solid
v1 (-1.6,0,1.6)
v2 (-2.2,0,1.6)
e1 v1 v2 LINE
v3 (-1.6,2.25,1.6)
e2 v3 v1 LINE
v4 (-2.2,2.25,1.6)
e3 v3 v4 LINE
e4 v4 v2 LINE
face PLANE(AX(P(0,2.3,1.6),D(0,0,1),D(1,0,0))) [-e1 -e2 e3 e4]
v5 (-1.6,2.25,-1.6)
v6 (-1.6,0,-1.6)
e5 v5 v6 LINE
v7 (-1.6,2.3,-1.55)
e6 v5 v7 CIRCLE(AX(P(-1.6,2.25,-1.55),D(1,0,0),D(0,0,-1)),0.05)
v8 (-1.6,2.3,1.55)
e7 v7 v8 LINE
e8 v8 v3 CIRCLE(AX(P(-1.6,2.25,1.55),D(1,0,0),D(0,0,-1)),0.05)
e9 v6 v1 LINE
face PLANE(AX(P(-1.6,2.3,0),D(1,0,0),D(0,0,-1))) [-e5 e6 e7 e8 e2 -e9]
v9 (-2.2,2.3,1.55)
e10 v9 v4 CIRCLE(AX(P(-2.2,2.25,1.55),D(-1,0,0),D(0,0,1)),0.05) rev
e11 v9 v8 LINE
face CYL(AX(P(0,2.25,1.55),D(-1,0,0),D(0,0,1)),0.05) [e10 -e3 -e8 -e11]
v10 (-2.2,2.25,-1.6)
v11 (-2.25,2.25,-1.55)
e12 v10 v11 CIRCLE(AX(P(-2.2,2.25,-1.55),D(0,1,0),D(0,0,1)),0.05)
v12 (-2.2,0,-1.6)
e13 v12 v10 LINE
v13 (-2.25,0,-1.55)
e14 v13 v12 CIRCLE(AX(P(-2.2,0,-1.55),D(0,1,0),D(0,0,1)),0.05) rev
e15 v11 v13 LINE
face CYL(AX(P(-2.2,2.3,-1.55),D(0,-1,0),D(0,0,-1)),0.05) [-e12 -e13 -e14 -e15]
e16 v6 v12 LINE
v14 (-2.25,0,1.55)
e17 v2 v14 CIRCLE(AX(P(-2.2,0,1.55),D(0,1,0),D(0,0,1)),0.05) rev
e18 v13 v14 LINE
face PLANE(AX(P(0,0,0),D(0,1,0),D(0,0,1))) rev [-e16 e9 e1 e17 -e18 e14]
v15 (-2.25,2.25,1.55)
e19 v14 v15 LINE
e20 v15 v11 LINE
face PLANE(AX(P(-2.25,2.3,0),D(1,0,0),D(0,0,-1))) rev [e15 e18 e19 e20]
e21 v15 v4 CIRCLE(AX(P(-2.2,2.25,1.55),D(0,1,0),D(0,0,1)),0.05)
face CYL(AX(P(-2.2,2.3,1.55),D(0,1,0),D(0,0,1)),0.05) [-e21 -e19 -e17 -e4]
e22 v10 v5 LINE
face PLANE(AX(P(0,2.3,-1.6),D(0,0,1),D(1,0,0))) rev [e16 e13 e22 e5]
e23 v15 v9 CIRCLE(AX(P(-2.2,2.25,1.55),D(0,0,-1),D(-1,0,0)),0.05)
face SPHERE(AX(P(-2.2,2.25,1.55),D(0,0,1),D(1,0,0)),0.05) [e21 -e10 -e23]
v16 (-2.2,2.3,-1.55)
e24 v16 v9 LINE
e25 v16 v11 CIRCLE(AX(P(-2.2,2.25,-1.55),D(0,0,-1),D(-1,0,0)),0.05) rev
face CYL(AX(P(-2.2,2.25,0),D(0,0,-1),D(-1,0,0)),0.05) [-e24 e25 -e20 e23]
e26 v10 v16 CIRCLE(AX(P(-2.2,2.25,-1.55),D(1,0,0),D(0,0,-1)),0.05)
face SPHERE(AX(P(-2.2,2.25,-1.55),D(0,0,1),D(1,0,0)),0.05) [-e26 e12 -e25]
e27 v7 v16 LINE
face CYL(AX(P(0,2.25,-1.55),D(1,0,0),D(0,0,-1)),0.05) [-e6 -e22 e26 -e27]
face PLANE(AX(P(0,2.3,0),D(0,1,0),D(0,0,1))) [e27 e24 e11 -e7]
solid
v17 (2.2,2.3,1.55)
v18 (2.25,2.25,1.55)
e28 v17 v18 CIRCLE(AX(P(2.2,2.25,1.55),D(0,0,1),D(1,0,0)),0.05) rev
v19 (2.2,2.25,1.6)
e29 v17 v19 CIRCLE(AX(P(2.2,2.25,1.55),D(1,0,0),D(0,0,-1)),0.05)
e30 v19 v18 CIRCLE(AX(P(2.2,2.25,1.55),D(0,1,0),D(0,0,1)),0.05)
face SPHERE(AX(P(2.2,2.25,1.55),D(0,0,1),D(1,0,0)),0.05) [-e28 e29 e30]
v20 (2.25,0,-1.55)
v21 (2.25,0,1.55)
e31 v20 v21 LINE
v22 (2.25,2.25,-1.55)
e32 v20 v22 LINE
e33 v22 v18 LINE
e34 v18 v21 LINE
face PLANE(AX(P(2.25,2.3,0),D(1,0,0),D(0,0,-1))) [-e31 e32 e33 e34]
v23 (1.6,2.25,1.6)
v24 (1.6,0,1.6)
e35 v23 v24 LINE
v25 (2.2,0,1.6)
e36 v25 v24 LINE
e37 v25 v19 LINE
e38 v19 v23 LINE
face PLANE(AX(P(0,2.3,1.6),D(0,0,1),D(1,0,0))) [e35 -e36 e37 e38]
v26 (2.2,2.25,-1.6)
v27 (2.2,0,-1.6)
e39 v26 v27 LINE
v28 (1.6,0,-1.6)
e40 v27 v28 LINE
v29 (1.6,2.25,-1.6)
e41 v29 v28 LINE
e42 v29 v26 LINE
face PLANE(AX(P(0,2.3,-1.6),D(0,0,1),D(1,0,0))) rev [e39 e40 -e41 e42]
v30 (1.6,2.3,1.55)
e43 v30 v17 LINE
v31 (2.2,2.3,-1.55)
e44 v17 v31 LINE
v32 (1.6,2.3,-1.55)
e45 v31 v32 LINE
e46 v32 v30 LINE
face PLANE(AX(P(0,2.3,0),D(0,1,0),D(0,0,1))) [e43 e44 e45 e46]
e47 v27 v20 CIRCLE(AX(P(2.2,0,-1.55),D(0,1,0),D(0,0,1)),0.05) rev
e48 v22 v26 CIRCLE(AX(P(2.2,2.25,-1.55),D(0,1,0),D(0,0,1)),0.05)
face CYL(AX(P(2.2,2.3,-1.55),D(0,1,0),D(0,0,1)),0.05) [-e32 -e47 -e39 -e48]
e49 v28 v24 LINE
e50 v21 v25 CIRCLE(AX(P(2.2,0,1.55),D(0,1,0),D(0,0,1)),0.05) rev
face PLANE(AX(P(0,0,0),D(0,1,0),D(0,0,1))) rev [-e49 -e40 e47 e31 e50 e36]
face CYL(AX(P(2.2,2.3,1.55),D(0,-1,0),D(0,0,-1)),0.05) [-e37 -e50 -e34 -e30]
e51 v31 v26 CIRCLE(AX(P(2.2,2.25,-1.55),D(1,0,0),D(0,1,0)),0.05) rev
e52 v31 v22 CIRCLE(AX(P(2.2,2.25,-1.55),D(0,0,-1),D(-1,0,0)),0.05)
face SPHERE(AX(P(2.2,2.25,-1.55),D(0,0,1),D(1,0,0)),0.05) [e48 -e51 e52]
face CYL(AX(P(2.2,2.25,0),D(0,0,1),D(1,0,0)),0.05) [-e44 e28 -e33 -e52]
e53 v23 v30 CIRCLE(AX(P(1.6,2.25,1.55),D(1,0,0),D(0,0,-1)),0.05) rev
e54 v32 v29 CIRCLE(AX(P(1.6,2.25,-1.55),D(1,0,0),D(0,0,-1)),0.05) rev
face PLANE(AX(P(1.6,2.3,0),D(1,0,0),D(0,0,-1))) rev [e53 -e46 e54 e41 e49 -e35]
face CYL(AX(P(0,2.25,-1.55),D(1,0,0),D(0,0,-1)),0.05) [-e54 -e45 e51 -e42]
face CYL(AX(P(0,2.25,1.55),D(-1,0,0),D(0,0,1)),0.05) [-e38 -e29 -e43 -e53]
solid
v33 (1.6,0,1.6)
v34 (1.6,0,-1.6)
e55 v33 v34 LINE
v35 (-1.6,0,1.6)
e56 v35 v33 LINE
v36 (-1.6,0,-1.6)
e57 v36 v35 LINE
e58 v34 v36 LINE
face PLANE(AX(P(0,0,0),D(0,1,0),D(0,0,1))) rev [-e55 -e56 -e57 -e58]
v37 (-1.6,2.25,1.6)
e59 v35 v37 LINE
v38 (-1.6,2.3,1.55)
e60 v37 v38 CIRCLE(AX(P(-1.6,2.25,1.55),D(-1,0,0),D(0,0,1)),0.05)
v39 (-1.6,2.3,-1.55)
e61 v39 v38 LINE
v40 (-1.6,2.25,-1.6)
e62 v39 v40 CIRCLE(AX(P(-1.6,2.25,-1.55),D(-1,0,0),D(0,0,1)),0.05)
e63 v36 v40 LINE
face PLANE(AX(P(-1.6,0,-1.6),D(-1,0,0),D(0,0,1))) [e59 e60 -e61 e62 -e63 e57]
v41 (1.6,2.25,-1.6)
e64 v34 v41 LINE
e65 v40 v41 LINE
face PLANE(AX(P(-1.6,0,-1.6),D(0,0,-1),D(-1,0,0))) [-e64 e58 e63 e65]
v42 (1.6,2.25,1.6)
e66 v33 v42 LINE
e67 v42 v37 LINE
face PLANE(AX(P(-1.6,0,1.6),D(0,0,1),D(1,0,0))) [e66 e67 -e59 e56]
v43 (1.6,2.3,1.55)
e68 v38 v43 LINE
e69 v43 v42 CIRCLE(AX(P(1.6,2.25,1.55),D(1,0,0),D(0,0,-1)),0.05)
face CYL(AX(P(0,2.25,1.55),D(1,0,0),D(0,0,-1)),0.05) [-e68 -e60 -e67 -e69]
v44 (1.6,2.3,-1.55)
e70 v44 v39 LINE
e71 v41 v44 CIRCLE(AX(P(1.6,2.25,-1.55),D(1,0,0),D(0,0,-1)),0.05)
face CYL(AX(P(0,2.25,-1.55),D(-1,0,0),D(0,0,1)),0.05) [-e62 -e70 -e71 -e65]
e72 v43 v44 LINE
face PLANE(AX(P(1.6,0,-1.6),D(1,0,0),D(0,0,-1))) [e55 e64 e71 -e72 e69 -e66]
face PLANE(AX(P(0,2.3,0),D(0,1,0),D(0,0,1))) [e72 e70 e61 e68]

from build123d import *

# Parameters (mm, degrees)
CROQUIS1_W                = 0.65
CROQUIS1_H                = 3.2
SALIENTE_EXTRUIR1_DEPTH   = 2.3
SALIENTE_EXTRUIR1_2_DEPTH = 2.3
CROQUIS2_W                = 3.2
CROQUIS2_H                = 3.2
SALIENTE_EXTRUIR2_DEPTH   = 2.3
REDONDEO1_R               = 0.05
REDONDEO2_R               = 0.05
REDONDEO3_R               = 0.05
REDONDEO4_R               = 0.05


with BuildPart() as part:
    # Croquis1 → Saliente-Extruir1 (new body)
    with BuildSketch(Plane(origin=(0, 0, 0), x_dir=(1, 0, 0), z_dir=(0, 1, 0))):
        with Locations((-1.925, 0)):
            Rectangle(CROQUIS1_W, CROQUIS1_H)
    extrude(amount=SALIENTE_EXTRUIR1_DEPTH)

    # Redondeo1
    redondeo1_edges = [part.edges().sort_by_distance(p)[0] for p in [
        (-2.25, 2.3, 0),
        (-1.925, 2.3, 1.6),
        (-1.925, 2.3, -1.6),
    ]]
    fillet(redondeo1_edges, radius=REDONDEO1_R)

    # Redondeo4
    # the kernel refuses this fillet: 0.05 mm, written as the material it takes off along each edge
    with BuildSketch(Plane(origin=(-2.2, 2.25, 1.55), x_dir=(-1, 0, 0), z_dir=(0, 0, 1))) as redondeo4_piece_1_section:
        Polygon((0, 0), (REDONDEO4_R, 0), (REDONDEO4_R, -REDONDEO4_R), (0, -REDONDEO4_R), align=None)
    redondeo4_piece_1 = extrude(amount=REDONDEO4_R, mode=Mode.PRIVATE)
    redondeo4_piece_1 = redondeo4_piece_1 - Plane(origin=(-2.2, 2.25, 1.55), x_dir=(0.7071067811865475, -0.7071067811865475, 0), z_dir=(0, 0, 1)) * Sphere(REDONDEO4_R, mode=Mode.PRIVATE)
    add(redondeo4_piece_1, mode=Mode.SUBTRACT)
    with BuildSketch(Plane(origin=(-2.2, 2.25, -1.55), x_dir=(0, 0, -1), z_dir=(-1, 0, 0))) as redondeo4_piece_2_section:
        Polygon((0, 0), (REDONDEO4_R, 0), (REDONDEO4_R, -REDONDEO4_R), (0, -REDONDEO4_R), align=None)
    redondeo4_piece_2 = extrude(amount=REDONDEO4_R, mode=Mode.PRIVATE)
    redondeo4_piece_2 = redondeo4_piece_2 - Plane(origin=(-2.2, 2.25, -1.55), x_dir=(0, -0.7071067811865475, 0.7071067811865475), z_dir=(-1, 0, 0)) * Sphere(REDONDEO4_R, mode=Mode.PRIVATE)
    add(redondeo4_piece_2, mode=Mode.SUBTRACT)
    with BuildSketch(Plane(origin=(-2.25, -0.125, -1.6), x_dir=(0, 0, 1), z_dir=(0, 1, 0)), Plane(origin=(-2.25, -0.125, 1.6), x_dir=(1, 0, 0), z_dir=(0, 1, 0))) as redondeo4_piece_3:
        with BuildLine():
            CenterArc((REDONDEO4_R, REDONDEO4_R), REDONDEO4_R, 180, 90)
            Line((0, REDONDEO4_R), (0, 0))
            Line((0, 0), (REDONDEO4_R, 0))
        make_face()
    extrude(amount=2.375, mode=Mode.SUBTRACT)


with BuildPart() as body_2:
    # Croquis1 → Saliente-Extruir1 2 (new body)
    with BuildSketch(Plane(origin=(0, 0, 0), x_dir=(1, 0, 0), z_dir=(0, 1, 0))):
        with Locations((1.925, 0)):
            Rectangle(CROQUIS1_W, CROQUIS1_H)
    extrude(amount=SALIENTE_EXTRUIR1_2_DEPTH)

    # Redondeo3
    redondeo3_edges = [body_2.edges().sort_by_distance(p)[0] for p in [
        (1.925, 2.3, 1.6),
        (2.25, 2.3, 0),
        (1.925, 2.3, -1.6),
        (2.25, 1.15, -1.6),
        (2.25, 1.15, 1.6),
    ]]
    fillet(redondeo3_edges, radius=REDONDEO3_R)


with BuildPart() as body_3:
    # Croquis2 → Saliente-Extruir2 (new, through all)
    with BuildSketch(Plane(origin=(0, 2.3, 0), x_dir=(1, 0, 0), z_dir=(0, 1, 0))):
        Rectangle(CROQUIS2_W, CROQUIS2_H)
    extrude(amount=-SALIENTE_EXTRUIR2_DEPTH)

    # Redondeo2
    redondeo2_edges = [body_3.edges().sort_by_distance(p)[0] for p in [
        (0, 2.3, -1.6),
        (0, 2.3, 1.6),
    ]]
    fillet(redondeo2_edges, radius=REDONDEO2_R)


solid = Compound([part.part, body_2.part, body_3.part])
